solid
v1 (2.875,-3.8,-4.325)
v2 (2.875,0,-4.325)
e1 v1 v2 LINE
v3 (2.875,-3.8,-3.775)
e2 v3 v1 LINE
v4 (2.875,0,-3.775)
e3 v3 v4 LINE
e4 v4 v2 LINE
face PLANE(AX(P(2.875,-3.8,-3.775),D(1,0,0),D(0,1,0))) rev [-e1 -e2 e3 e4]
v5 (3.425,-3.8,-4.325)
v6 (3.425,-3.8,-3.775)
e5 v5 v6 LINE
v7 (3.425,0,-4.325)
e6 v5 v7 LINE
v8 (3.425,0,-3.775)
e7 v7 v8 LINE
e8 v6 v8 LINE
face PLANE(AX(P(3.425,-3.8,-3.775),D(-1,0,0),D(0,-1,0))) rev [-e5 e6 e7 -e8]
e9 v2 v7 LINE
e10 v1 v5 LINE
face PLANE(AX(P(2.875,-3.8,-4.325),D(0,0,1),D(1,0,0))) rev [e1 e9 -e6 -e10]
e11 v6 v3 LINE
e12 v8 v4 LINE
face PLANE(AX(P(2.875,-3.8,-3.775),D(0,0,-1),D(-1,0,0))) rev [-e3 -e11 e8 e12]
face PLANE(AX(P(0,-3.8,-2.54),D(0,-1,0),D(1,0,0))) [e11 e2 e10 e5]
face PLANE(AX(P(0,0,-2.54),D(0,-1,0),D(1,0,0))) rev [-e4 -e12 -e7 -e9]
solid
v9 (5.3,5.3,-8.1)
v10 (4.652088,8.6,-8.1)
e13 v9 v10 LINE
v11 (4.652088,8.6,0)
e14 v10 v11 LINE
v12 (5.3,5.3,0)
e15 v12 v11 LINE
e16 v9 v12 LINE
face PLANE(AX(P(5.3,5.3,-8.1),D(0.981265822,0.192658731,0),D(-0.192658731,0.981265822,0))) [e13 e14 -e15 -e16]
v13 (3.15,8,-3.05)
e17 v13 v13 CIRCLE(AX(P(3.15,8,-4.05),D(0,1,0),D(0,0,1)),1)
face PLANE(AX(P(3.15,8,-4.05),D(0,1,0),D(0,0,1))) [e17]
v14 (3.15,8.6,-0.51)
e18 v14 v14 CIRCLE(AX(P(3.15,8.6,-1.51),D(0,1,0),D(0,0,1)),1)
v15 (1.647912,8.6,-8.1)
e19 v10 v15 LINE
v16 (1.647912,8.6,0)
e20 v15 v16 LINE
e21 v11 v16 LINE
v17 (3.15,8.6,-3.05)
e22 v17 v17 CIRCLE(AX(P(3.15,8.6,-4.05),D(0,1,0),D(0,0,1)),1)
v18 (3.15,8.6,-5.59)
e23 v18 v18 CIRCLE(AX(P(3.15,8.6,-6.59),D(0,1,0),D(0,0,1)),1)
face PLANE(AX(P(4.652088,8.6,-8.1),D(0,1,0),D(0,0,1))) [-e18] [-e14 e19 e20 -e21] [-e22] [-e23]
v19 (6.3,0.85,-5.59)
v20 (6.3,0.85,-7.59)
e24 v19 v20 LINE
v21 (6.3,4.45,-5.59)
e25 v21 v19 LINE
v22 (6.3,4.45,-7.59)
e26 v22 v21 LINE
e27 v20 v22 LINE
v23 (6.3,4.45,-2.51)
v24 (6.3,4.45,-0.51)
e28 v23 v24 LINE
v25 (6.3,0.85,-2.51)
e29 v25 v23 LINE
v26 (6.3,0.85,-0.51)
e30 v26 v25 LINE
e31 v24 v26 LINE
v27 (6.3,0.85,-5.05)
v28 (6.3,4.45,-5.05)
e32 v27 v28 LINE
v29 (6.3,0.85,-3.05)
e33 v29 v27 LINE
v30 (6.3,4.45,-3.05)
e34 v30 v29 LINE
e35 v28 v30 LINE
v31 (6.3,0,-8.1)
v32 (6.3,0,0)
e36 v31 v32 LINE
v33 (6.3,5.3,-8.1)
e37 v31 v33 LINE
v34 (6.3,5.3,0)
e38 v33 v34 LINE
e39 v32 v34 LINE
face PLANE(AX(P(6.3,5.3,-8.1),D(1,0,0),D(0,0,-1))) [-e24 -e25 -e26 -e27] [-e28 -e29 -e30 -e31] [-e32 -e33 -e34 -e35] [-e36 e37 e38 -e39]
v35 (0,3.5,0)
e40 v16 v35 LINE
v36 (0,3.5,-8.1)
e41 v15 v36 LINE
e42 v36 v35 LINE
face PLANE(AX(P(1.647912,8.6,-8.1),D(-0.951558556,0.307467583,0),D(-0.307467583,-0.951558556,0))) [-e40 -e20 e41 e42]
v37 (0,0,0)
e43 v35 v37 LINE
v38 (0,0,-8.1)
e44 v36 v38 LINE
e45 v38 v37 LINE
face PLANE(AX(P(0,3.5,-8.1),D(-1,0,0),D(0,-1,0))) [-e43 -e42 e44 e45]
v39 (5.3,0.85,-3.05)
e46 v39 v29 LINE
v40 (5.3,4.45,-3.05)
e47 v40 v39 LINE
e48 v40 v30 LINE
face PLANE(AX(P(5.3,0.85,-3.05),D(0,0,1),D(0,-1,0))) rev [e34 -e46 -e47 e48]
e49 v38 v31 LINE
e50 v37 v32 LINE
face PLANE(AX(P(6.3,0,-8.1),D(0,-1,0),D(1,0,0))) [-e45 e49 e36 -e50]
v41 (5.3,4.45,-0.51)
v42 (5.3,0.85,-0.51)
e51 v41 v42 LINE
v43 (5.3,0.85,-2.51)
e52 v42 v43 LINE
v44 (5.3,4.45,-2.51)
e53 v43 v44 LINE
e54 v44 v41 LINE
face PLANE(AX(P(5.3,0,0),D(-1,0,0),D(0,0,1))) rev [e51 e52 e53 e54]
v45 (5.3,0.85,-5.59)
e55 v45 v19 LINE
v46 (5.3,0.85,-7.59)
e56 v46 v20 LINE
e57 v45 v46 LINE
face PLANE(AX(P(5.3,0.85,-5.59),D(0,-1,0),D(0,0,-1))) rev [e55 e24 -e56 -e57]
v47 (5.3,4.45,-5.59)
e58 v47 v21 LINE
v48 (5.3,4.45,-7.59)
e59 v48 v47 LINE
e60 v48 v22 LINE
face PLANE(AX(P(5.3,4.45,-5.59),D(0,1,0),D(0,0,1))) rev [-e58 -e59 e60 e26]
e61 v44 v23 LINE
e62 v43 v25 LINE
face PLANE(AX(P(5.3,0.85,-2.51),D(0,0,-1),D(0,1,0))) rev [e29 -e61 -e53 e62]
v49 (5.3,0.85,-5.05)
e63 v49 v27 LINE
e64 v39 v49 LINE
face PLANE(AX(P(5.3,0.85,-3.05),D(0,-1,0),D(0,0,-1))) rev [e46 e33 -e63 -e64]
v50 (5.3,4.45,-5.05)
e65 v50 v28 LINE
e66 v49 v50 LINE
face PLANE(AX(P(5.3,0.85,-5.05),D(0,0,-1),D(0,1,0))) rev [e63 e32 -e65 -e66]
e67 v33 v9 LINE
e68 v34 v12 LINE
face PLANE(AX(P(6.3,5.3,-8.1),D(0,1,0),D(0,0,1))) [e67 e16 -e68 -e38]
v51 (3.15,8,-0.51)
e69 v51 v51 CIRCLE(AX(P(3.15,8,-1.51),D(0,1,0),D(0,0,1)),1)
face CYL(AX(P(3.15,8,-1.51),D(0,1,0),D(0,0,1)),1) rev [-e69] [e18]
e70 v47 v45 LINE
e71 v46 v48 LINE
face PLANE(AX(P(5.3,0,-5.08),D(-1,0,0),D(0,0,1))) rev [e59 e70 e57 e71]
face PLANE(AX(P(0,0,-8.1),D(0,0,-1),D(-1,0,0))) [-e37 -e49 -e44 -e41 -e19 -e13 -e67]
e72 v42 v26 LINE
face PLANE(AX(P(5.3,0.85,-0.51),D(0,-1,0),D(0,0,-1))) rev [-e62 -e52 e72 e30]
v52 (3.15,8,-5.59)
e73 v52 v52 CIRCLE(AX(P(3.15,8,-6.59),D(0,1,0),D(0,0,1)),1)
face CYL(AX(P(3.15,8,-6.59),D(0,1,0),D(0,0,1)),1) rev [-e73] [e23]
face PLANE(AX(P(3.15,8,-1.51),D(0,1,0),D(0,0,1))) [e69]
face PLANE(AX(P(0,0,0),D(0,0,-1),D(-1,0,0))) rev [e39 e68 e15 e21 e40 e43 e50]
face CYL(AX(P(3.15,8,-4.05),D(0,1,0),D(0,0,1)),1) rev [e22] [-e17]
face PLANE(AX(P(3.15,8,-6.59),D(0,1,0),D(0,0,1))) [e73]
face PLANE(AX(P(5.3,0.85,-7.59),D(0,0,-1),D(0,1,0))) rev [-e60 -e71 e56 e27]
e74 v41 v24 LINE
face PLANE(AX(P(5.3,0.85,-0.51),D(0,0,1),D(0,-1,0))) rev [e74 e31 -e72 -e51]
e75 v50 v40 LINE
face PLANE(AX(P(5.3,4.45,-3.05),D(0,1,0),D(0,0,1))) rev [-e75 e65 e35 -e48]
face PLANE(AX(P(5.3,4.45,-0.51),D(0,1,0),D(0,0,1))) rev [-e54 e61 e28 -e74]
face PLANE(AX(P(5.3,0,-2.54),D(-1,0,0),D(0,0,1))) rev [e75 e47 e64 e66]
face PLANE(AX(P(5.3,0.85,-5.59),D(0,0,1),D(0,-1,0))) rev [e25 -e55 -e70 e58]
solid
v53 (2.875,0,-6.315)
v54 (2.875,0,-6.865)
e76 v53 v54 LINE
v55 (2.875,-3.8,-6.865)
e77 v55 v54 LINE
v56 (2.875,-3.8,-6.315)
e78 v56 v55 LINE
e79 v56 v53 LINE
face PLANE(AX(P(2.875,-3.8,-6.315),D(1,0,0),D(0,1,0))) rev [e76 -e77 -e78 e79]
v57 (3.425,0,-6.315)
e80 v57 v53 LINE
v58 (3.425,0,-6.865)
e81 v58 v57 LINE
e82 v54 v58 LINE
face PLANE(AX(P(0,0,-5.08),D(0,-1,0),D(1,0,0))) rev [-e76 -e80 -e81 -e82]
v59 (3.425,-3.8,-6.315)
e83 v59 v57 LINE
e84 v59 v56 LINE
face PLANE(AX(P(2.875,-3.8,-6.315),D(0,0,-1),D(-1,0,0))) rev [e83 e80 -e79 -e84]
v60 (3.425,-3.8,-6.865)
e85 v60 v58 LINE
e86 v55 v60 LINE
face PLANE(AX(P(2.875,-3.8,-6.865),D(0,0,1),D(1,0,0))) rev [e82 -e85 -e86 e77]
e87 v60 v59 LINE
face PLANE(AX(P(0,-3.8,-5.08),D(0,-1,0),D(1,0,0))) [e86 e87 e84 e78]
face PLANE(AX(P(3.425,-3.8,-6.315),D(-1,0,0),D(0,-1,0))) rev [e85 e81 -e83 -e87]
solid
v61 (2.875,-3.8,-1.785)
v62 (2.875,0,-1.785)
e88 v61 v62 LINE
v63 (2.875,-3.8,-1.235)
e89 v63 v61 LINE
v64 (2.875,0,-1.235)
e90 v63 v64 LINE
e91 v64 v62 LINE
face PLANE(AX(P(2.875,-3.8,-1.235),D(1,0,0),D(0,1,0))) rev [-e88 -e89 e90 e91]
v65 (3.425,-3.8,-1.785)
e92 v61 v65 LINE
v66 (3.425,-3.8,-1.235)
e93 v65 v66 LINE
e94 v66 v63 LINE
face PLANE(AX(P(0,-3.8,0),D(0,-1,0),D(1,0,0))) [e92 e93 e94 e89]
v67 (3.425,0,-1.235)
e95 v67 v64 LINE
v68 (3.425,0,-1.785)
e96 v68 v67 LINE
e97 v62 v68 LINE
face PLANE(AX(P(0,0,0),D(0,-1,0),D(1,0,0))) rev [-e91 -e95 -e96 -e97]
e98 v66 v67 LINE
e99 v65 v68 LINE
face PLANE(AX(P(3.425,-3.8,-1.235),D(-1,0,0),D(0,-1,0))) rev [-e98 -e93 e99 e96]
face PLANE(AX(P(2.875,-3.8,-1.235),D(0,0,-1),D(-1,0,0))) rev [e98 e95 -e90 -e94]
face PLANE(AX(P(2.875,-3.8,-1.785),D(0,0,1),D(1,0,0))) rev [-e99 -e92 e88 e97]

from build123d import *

# Parameters (mm, degrees)
BOSS_EXTRUDE1_DEPTH   = 8.1
SKETCH3_R             = 1
CUT_EXTRUDE1_DEPTH    = 0.6
SKETCH4_W             = 2
SKETCH4_H             = 3.6
CUT_EXTRUDE2_DEPTH    = 1
SKETCH5_W             = 0.55
SKETCH5_H             = 0.55
BOSS_EXTRUDE2_DEPTH   = 3.8
LPATTERN1_START       = 2.875
LPATTERN1_OUTLINE_W   = 3.8
LPATTERN1_OUTLINE_H   = 0.55
LPATTERN1_DEPTH       = 0.55
LPATTERN1_2_OUTLINE_W = 3.8
LPATTERN1_2_OUTLINE_H = 0.55
LPATTERN1_2_DEPTH     = 0.55
LPATTERN1_START_2     = 0.85
LPATTERN1_3_OUTLINE_W = 1
LPATTERN1_3_OUTLINE_H = 2
LPATTERN1_3_DEPTH     = 3.6
LPATTERN1_START_3     = 8
LPATTERN1_4_OUTLINE_R = 1
LPATTERN1_4_DEPTH     = 0.6


# Read off the part's stored shape, not the designer's step: LPattern1
with BuildPart() as part:
    # Sketch2 → Boss-Extrude1 (new body)
    with BuildSketch(Plane.XY):
        Polygon((6.3, 5.3), (5.3, 5.3), (4.652088092, 8.6), (1.647911908, 8.6), (0, 3.5), (0, 0), (6.3, 0), align=None)
    extrude(amount=-BOSS_EXTRUDE1_DEPTH)

    # Sketch3 → Cut-Extrude1 (cut)
    with BuildSketch(Plane(origin=(0, 8.6, 0), x_dir=(1, 0, 0), z_dir=(0, 1, 0))):
        with Locations(Location((3.15, 1.51, 0), (0, 0, 270))):
            Circle(SKETCH3_R)
    extrude(amount=-CUT_EXTRUDE1_DEPTH, mode=Mode.SUBTRACT)

    # Sketch4 → Cut-Extrude2 (cut)
    with BuildSketch(Plane(origin=(6.3, 0, 0), x_dir=(0, 0, -1), z_dir=(1, 0, 0))):
        with Locations((1.51, 2.65)):
            Rectangle(SKETCH4_W, SKETCH4_H)
    extrude(amount=-CUT_EXTRUDE2_DEPTH, mode=Mode.SUBTRACT)

    # LPattern1 3 outline → LPattern1 3 (cut)
    with BuildSketch(Plane(origin=(0, 0, 0), x_dir=(1, 0, 0), z_dir=(0, 1, 0)).offset(LPATTERN1_START_2)):
        with Locations((5.8, 6.59)):
            Rectangle(LPATTERN1_3_OUTLINE_W, LPATTERN1_3_OUTLINE_H)
        with Locations((5.8, 4.05)):
            Rectangle(LPATTERN1_3_OUTLINE_W, LPATTERN1_3_OUTLINE_H)
    extrude(amount=LPATTERN1_3_DEPTH, mode=Mode.SUBTRACT)

    # LPattern1 4 outline → LPattern1 4 (cut)
    with BuildSketch(Plane(origin=(0, 0, 0), x_dir=(1, 0, 0), z_dir=(0, 1, 0)).offset(LPATTERN1_START_3)):
        with Locations((3.15, 6.59)):
            Circle(LPATTERN1_4_OUTLINE_R)
        with Locations((3.15, 4.05)):
            Circle(LPATTERN1_4_OUTLINE_R)
    extrude(amount=LPATTERN1_4_DEPTH, mode=Mode.SUBTRACT)


with BuildPart() as body_2:
    # Sketch5 → Boss-Extrude2 (new body)
    with BuildSketch(Plane.XZ):
        with Locations((3.15, -1.51)):
            Rectangle(SKETCH5_W, SKETCH5_H)
    extrude(amount=BOSS_EXTRUDE2_DEPTH)


with BuildPart() as body_3:
    # LPattern1 outline → LPattern1 (new body)
    with BuildSketch(Plane.YZ.offset(LPATTERN1_START)):
        with Locations((-1.9, -6.59)):
            Rectangle(LPATTERN1_OUTLINE_W, LPATTERN1_OUTLINE_H)
    extrude(amount=LPATTERN1_DEPTH)


with BuildPart() as body_4:
    # LPattern1 2 outline → LPattern1 2 (new body)
    with BuildSketch(Plane.YZ.offset(LPATTERN1_START)):
        with Locations((-1.9, -4.05)):
            Rectangle(LPATTERN1_2_OUTLINE_W, LPATTERN1_2_OUTLINE_H)
    extrude(amount=LPATTERN1_2_DEPTH)


solid = Compound([part.part, body_2.part, body_3.part, body_4.part])
